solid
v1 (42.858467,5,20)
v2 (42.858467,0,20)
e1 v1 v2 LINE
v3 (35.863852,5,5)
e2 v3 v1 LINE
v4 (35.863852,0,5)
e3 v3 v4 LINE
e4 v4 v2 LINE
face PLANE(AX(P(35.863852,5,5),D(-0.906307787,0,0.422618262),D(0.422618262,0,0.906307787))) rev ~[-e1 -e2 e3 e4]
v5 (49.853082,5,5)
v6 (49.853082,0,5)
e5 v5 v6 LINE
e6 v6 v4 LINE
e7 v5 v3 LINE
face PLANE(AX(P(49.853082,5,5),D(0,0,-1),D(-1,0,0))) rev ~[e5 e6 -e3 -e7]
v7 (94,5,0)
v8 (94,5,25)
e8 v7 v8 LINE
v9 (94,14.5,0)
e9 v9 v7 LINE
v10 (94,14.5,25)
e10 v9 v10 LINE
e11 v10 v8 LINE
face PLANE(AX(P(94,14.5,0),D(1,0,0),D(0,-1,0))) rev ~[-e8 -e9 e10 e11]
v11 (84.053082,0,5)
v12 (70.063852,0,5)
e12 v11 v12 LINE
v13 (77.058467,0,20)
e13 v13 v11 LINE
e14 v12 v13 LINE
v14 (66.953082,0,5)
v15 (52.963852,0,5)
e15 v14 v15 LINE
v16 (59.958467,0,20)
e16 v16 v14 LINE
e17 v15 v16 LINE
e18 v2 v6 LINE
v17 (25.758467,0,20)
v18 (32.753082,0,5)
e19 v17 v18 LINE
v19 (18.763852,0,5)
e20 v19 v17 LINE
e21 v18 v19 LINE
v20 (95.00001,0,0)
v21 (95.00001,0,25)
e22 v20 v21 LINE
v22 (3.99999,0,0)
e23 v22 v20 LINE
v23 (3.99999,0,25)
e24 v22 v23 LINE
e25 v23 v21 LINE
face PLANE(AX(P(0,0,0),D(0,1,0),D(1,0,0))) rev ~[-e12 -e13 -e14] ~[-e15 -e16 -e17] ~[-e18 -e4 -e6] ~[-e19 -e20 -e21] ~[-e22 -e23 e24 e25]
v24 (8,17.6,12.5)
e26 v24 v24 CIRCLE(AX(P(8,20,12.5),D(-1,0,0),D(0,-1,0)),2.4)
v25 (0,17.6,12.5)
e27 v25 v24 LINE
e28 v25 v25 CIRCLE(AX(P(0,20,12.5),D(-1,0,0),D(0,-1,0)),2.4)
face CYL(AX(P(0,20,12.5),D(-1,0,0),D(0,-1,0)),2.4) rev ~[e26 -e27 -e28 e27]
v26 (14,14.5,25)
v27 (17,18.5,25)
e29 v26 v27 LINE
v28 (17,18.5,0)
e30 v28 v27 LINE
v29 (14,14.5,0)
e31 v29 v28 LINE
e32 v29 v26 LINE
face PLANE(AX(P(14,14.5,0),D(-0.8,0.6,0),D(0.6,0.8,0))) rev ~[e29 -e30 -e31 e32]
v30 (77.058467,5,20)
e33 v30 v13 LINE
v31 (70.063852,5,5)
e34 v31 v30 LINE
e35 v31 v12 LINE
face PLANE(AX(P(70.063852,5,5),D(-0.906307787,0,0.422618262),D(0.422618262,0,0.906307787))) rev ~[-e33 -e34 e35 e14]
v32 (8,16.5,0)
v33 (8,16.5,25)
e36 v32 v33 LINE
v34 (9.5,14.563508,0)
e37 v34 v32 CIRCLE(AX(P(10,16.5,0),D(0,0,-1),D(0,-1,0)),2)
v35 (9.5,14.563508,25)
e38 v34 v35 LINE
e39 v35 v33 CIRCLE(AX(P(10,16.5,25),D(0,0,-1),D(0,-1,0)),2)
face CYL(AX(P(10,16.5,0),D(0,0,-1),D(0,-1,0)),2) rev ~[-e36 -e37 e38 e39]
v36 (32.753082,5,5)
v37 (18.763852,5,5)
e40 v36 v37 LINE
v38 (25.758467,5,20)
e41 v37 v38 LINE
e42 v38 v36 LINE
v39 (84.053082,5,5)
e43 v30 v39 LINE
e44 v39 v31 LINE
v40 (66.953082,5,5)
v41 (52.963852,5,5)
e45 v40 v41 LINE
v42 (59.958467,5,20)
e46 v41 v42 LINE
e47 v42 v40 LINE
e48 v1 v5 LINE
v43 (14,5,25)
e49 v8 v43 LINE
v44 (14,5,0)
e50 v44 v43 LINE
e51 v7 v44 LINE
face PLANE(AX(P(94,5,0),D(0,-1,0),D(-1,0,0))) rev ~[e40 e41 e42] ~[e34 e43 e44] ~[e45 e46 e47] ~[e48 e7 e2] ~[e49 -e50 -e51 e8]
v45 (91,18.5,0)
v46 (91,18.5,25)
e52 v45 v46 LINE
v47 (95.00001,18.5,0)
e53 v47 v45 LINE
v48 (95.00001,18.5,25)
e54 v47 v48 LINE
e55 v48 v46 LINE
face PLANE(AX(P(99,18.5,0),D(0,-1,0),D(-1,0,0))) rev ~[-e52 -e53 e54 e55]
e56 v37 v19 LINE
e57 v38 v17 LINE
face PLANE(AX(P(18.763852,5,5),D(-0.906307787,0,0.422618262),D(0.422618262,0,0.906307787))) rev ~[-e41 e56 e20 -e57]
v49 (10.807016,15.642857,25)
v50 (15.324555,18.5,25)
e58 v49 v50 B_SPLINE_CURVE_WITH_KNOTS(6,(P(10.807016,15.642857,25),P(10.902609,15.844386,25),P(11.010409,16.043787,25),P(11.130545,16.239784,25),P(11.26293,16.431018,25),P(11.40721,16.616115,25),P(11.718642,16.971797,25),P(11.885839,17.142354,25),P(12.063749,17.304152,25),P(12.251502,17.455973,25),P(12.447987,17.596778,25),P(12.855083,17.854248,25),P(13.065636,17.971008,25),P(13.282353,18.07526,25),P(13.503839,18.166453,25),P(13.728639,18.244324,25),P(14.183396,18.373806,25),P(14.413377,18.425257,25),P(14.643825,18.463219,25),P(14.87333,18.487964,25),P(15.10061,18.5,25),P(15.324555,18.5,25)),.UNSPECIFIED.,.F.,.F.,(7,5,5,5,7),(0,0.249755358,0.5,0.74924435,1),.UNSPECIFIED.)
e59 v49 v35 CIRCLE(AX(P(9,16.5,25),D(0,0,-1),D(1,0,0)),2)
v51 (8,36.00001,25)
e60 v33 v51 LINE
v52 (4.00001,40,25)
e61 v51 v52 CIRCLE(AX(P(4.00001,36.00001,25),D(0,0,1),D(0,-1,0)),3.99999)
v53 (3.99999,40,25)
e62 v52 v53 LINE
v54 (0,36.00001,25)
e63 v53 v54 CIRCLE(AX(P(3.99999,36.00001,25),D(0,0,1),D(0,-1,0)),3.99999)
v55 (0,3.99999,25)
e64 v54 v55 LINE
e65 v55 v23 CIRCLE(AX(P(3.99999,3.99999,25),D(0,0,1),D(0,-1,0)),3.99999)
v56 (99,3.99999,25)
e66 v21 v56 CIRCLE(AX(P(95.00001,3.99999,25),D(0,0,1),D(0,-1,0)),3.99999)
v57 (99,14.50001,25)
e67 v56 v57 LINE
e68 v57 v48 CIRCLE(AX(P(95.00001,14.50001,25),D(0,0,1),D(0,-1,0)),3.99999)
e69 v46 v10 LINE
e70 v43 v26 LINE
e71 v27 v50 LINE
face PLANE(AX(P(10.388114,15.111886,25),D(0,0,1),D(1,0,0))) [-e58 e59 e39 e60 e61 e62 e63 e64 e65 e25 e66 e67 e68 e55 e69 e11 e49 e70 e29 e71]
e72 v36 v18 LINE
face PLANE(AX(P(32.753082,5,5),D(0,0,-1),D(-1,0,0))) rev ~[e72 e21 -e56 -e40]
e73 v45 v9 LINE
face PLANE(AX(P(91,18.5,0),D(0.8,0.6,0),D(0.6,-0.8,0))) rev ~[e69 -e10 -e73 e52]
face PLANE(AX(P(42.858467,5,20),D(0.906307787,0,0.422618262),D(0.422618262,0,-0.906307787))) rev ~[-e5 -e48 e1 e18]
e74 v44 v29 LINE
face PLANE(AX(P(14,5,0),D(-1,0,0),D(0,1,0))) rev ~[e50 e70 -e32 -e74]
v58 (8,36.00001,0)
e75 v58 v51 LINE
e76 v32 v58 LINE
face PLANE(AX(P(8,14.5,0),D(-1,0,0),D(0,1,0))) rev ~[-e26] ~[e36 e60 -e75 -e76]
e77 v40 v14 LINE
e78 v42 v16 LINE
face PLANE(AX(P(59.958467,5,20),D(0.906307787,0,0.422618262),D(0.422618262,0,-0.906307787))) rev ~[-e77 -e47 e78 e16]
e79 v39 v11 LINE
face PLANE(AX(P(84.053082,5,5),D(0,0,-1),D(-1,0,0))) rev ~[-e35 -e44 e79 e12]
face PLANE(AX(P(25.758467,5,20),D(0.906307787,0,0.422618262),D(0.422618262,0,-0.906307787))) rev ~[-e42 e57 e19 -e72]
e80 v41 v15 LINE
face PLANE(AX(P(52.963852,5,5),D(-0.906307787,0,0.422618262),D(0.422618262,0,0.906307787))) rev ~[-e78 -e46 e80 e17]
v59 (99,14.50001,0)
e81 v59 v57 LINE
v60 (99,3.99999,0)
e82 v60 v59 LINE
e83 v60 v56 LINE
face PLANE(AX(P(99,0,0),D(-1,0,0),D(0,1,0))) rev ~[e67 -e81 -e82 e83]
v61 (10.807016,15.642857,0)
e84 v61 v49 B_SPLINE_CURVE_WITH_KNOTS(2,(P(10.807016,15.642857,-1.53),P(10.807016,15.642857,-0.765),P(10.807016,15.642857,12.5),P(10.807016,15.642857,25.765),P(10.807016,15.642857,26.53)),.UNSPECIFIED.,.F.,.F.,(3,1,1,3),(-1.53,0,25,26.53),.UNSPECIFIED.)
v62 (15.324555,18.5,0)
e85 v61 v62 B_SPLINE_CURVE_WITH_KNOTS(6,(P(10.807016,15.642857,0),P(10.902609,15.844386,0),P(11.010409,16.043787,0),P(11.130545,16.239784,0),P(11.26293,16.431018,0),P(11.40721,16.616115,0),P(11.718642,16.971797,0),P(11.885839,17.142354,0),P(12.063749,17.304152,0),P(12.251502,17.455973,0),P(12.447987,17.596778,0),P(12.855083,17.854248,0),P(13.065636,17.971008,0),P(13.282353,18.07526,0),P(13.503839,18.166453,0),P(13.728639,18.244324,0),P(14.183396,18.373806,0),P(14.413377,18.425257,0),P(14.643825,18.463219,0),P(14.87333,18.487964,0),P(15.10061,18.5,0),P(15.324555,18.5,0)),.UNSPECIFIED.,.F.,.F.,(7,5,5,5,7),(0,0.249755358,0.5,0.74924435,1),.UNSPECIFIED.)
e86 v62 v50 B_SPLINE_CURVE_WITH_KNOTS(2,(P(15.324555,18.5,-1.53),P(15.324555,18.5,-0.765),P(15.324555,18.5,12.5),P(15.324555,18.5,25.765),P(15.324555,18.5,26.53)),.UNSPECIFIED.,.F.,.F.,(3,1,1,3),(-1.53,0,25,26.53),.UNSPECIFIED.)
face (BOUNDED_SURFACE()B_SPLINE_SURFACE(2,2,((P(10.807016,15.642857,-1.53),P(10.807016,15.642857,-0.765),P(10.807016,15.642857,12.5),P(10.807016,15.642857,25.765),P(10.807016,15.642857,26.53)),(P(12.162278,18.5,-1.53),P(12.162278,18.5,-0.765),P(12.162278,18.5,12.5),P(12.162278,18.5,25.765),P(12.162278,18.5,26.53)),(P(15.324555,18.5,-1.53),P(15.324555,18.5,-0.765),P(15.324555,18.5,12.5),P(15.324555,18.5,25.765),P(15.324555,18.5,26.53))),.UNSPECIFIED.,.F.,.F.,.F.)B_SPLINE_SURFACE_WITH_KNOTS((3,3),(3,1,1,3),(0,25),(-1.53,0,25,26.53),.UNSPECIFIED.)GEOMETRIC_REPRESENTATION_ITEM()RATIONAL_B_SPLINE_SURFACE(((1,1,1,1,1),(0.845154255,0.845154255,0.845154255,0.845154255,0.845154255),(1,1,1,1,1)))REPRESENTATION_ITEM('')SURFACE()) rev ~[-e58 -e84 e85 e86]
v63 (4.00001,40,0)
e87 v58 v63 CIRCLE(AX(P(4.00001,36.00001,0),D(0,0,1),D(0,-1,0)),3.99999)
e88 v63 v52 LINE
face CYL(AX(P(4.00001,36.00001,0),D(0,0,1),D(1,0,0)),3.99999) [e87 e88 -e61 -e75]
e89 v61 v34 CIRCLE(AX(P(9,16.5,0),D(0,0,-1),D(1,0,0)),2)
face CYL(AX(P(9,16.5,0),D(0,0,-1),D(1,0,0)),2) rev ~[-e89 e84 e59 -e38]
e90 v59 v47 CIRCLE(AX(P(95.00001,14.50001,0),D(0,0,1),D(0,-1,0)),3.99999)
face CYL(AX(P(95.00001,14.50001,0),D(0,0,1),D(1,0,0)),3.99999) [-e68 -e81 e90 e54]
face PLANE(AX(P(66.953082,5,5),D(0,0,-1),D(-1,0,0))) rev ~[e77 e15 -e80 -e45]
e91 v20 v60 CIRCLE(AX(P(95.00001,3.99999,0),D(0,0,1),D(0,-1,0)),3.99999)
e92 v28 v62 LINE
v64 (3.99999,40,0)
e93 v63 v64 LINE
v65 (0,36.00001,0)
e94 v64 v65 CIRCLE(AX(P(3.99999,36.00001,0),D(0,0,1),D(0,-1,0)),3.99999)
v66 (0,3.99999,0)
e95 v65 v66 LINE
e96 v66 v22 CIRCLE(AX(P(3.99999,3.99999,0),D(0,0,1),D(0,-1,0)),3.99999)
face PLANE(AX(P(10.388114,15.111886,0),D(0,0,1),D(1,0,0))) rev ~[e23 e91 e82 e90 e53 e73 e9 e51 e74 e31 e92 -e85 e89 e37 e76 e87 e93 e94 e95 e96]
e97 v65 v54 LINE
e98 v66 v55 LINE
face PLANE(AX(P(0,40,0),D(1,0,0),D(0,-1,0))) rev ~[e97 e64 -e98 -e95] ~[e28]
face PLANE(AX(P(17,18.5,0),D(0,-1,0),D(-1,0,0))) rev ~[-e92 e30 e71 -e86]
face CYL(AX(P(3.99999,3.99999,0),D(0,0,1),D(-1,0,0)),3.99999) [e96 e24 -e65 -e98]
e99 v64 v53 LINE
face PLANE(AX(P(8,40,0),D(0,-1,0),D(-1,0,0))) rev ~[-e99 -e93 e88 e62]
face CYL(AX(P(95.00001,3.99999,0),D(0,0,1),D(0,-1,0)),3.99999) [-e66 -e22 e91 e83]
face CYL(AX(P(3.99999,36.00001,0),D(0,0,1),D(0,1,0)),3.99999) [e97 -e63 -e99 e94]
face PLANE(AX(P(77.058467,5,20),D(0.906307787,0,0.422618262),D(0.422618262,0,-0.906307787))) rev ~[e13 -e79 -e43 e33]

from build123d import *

# Parameters (mm, degrees)
F1_DEPTH    = 25
F2_T1_DEPTH = 25
F3_R        = 5
F4_R        = 3.99999
F5_R        = 2.4
F6_DEPTH    = 8
F8_DEPTH    = 5


# Not quite as in the source:
# - a fillet or chamfer that OpenCascade refuses, or shapes differently, is made with other operations: its cross-section is extruded or revolved along the edge and cut away or added
# - a fillet or chamfer is up to 0.001 mm smaller than in the source, because OpenCascade refuses the exact size


with BuildPart() as f1:
    # F0 (on Top) → F1 (new body)
    with BuildSketch(Plane.XY):
        Polygon((8, 40), (0, 40), (0, 0), (99, 0), (99, 18.5), (91, 18.5), (94, 14.5), (94, 5), (14, 5), (14, 14.5), (17, 18.5), (11, 18.5), (11, 14.5), (8, 14.5), align=None)
    extrude(amount=F1_DEPTH)

    # F2: fillet of radius 2 on 2 edges, made by hand

    # F2_s2 → F2_t1 (join)
    with BuildSketch(Plane.XY):
        with BuildLine():
            ThreePointArc((11, 16.5), (10.4142135624, 15.0857864376), (9, 14.5))
            Line((9, 14.5), (11, 14.5))
            Line((11, 14.5), (11, 16.5))
        make_face()
        with BuildLine():
            ThreePointArc((10, 14.5), (8.5857864376, 15.0857864376), (8, 16.5))
            Line((8, 16.5), (8, 14.5))
            Line((8, 14.5), (10, 14.5))
        make_face()
    extrude(amount=F2_T1_DEPTH)

    # F3
    f3_edges = [f1.edges().sort_by_distance(p)[0] for p in [
        (11, 18.5, 12.5),
    ]]
    fillet(f3_edges, radius=F3_R)

    # F4 (radius 4 in the source; OpenCascade refuses exactly that, so slightly less here)
    f4_edges = [f1.edges().sort_by_distance(p)[0] for p in [
        (99, 18.5, 12.5),
        (99, 0, 12.5),
        (0, 0, 12.5),
        (0, 40, 12.5),
        (8, 40, 12.5),
    ]]
    fillet(f4_edges, radius=F4_R)

    # F5 (on face) → F6 (cut, through all)
    with BuildSketch(Plane(origin=(0, 0, 0), x_dir=(0, -1, 0), z_dir=(-1, 0, 0))):
        with Locations((-20, 12.5)):
            Circle(F5_R)
    extrude(amount=-F6_DEPTH, mode=Mode.SUBTRACT)

    # F7 (on face) → F8 (cut, through all)
    with BuildSketch(Plane(origin=(0, 5, 0), x_dir=(-1, 0, 0), z_dir=(0, 1, 0))):
        Polygon((-77.0584673027, 20), (-84.053082175, 5), (-70.0638524304, 5), align=None)
        Polygon((-66.953082175, 5), (-52.9638524304, 5), (-59.9584673027, 20), align=None)
        Polygon((-49.853082175, 5), (-35.8638524304, 5), (-42.8584673027, 20), align=None)
        Polygon((-32.753082175, 5), (-18.7638524304, 5), (-25.7584673027, 20), align=None)
    extrude(amount=-F8_DEPTH, mode=Mode.SUBTRACT)


solid = f1.part
